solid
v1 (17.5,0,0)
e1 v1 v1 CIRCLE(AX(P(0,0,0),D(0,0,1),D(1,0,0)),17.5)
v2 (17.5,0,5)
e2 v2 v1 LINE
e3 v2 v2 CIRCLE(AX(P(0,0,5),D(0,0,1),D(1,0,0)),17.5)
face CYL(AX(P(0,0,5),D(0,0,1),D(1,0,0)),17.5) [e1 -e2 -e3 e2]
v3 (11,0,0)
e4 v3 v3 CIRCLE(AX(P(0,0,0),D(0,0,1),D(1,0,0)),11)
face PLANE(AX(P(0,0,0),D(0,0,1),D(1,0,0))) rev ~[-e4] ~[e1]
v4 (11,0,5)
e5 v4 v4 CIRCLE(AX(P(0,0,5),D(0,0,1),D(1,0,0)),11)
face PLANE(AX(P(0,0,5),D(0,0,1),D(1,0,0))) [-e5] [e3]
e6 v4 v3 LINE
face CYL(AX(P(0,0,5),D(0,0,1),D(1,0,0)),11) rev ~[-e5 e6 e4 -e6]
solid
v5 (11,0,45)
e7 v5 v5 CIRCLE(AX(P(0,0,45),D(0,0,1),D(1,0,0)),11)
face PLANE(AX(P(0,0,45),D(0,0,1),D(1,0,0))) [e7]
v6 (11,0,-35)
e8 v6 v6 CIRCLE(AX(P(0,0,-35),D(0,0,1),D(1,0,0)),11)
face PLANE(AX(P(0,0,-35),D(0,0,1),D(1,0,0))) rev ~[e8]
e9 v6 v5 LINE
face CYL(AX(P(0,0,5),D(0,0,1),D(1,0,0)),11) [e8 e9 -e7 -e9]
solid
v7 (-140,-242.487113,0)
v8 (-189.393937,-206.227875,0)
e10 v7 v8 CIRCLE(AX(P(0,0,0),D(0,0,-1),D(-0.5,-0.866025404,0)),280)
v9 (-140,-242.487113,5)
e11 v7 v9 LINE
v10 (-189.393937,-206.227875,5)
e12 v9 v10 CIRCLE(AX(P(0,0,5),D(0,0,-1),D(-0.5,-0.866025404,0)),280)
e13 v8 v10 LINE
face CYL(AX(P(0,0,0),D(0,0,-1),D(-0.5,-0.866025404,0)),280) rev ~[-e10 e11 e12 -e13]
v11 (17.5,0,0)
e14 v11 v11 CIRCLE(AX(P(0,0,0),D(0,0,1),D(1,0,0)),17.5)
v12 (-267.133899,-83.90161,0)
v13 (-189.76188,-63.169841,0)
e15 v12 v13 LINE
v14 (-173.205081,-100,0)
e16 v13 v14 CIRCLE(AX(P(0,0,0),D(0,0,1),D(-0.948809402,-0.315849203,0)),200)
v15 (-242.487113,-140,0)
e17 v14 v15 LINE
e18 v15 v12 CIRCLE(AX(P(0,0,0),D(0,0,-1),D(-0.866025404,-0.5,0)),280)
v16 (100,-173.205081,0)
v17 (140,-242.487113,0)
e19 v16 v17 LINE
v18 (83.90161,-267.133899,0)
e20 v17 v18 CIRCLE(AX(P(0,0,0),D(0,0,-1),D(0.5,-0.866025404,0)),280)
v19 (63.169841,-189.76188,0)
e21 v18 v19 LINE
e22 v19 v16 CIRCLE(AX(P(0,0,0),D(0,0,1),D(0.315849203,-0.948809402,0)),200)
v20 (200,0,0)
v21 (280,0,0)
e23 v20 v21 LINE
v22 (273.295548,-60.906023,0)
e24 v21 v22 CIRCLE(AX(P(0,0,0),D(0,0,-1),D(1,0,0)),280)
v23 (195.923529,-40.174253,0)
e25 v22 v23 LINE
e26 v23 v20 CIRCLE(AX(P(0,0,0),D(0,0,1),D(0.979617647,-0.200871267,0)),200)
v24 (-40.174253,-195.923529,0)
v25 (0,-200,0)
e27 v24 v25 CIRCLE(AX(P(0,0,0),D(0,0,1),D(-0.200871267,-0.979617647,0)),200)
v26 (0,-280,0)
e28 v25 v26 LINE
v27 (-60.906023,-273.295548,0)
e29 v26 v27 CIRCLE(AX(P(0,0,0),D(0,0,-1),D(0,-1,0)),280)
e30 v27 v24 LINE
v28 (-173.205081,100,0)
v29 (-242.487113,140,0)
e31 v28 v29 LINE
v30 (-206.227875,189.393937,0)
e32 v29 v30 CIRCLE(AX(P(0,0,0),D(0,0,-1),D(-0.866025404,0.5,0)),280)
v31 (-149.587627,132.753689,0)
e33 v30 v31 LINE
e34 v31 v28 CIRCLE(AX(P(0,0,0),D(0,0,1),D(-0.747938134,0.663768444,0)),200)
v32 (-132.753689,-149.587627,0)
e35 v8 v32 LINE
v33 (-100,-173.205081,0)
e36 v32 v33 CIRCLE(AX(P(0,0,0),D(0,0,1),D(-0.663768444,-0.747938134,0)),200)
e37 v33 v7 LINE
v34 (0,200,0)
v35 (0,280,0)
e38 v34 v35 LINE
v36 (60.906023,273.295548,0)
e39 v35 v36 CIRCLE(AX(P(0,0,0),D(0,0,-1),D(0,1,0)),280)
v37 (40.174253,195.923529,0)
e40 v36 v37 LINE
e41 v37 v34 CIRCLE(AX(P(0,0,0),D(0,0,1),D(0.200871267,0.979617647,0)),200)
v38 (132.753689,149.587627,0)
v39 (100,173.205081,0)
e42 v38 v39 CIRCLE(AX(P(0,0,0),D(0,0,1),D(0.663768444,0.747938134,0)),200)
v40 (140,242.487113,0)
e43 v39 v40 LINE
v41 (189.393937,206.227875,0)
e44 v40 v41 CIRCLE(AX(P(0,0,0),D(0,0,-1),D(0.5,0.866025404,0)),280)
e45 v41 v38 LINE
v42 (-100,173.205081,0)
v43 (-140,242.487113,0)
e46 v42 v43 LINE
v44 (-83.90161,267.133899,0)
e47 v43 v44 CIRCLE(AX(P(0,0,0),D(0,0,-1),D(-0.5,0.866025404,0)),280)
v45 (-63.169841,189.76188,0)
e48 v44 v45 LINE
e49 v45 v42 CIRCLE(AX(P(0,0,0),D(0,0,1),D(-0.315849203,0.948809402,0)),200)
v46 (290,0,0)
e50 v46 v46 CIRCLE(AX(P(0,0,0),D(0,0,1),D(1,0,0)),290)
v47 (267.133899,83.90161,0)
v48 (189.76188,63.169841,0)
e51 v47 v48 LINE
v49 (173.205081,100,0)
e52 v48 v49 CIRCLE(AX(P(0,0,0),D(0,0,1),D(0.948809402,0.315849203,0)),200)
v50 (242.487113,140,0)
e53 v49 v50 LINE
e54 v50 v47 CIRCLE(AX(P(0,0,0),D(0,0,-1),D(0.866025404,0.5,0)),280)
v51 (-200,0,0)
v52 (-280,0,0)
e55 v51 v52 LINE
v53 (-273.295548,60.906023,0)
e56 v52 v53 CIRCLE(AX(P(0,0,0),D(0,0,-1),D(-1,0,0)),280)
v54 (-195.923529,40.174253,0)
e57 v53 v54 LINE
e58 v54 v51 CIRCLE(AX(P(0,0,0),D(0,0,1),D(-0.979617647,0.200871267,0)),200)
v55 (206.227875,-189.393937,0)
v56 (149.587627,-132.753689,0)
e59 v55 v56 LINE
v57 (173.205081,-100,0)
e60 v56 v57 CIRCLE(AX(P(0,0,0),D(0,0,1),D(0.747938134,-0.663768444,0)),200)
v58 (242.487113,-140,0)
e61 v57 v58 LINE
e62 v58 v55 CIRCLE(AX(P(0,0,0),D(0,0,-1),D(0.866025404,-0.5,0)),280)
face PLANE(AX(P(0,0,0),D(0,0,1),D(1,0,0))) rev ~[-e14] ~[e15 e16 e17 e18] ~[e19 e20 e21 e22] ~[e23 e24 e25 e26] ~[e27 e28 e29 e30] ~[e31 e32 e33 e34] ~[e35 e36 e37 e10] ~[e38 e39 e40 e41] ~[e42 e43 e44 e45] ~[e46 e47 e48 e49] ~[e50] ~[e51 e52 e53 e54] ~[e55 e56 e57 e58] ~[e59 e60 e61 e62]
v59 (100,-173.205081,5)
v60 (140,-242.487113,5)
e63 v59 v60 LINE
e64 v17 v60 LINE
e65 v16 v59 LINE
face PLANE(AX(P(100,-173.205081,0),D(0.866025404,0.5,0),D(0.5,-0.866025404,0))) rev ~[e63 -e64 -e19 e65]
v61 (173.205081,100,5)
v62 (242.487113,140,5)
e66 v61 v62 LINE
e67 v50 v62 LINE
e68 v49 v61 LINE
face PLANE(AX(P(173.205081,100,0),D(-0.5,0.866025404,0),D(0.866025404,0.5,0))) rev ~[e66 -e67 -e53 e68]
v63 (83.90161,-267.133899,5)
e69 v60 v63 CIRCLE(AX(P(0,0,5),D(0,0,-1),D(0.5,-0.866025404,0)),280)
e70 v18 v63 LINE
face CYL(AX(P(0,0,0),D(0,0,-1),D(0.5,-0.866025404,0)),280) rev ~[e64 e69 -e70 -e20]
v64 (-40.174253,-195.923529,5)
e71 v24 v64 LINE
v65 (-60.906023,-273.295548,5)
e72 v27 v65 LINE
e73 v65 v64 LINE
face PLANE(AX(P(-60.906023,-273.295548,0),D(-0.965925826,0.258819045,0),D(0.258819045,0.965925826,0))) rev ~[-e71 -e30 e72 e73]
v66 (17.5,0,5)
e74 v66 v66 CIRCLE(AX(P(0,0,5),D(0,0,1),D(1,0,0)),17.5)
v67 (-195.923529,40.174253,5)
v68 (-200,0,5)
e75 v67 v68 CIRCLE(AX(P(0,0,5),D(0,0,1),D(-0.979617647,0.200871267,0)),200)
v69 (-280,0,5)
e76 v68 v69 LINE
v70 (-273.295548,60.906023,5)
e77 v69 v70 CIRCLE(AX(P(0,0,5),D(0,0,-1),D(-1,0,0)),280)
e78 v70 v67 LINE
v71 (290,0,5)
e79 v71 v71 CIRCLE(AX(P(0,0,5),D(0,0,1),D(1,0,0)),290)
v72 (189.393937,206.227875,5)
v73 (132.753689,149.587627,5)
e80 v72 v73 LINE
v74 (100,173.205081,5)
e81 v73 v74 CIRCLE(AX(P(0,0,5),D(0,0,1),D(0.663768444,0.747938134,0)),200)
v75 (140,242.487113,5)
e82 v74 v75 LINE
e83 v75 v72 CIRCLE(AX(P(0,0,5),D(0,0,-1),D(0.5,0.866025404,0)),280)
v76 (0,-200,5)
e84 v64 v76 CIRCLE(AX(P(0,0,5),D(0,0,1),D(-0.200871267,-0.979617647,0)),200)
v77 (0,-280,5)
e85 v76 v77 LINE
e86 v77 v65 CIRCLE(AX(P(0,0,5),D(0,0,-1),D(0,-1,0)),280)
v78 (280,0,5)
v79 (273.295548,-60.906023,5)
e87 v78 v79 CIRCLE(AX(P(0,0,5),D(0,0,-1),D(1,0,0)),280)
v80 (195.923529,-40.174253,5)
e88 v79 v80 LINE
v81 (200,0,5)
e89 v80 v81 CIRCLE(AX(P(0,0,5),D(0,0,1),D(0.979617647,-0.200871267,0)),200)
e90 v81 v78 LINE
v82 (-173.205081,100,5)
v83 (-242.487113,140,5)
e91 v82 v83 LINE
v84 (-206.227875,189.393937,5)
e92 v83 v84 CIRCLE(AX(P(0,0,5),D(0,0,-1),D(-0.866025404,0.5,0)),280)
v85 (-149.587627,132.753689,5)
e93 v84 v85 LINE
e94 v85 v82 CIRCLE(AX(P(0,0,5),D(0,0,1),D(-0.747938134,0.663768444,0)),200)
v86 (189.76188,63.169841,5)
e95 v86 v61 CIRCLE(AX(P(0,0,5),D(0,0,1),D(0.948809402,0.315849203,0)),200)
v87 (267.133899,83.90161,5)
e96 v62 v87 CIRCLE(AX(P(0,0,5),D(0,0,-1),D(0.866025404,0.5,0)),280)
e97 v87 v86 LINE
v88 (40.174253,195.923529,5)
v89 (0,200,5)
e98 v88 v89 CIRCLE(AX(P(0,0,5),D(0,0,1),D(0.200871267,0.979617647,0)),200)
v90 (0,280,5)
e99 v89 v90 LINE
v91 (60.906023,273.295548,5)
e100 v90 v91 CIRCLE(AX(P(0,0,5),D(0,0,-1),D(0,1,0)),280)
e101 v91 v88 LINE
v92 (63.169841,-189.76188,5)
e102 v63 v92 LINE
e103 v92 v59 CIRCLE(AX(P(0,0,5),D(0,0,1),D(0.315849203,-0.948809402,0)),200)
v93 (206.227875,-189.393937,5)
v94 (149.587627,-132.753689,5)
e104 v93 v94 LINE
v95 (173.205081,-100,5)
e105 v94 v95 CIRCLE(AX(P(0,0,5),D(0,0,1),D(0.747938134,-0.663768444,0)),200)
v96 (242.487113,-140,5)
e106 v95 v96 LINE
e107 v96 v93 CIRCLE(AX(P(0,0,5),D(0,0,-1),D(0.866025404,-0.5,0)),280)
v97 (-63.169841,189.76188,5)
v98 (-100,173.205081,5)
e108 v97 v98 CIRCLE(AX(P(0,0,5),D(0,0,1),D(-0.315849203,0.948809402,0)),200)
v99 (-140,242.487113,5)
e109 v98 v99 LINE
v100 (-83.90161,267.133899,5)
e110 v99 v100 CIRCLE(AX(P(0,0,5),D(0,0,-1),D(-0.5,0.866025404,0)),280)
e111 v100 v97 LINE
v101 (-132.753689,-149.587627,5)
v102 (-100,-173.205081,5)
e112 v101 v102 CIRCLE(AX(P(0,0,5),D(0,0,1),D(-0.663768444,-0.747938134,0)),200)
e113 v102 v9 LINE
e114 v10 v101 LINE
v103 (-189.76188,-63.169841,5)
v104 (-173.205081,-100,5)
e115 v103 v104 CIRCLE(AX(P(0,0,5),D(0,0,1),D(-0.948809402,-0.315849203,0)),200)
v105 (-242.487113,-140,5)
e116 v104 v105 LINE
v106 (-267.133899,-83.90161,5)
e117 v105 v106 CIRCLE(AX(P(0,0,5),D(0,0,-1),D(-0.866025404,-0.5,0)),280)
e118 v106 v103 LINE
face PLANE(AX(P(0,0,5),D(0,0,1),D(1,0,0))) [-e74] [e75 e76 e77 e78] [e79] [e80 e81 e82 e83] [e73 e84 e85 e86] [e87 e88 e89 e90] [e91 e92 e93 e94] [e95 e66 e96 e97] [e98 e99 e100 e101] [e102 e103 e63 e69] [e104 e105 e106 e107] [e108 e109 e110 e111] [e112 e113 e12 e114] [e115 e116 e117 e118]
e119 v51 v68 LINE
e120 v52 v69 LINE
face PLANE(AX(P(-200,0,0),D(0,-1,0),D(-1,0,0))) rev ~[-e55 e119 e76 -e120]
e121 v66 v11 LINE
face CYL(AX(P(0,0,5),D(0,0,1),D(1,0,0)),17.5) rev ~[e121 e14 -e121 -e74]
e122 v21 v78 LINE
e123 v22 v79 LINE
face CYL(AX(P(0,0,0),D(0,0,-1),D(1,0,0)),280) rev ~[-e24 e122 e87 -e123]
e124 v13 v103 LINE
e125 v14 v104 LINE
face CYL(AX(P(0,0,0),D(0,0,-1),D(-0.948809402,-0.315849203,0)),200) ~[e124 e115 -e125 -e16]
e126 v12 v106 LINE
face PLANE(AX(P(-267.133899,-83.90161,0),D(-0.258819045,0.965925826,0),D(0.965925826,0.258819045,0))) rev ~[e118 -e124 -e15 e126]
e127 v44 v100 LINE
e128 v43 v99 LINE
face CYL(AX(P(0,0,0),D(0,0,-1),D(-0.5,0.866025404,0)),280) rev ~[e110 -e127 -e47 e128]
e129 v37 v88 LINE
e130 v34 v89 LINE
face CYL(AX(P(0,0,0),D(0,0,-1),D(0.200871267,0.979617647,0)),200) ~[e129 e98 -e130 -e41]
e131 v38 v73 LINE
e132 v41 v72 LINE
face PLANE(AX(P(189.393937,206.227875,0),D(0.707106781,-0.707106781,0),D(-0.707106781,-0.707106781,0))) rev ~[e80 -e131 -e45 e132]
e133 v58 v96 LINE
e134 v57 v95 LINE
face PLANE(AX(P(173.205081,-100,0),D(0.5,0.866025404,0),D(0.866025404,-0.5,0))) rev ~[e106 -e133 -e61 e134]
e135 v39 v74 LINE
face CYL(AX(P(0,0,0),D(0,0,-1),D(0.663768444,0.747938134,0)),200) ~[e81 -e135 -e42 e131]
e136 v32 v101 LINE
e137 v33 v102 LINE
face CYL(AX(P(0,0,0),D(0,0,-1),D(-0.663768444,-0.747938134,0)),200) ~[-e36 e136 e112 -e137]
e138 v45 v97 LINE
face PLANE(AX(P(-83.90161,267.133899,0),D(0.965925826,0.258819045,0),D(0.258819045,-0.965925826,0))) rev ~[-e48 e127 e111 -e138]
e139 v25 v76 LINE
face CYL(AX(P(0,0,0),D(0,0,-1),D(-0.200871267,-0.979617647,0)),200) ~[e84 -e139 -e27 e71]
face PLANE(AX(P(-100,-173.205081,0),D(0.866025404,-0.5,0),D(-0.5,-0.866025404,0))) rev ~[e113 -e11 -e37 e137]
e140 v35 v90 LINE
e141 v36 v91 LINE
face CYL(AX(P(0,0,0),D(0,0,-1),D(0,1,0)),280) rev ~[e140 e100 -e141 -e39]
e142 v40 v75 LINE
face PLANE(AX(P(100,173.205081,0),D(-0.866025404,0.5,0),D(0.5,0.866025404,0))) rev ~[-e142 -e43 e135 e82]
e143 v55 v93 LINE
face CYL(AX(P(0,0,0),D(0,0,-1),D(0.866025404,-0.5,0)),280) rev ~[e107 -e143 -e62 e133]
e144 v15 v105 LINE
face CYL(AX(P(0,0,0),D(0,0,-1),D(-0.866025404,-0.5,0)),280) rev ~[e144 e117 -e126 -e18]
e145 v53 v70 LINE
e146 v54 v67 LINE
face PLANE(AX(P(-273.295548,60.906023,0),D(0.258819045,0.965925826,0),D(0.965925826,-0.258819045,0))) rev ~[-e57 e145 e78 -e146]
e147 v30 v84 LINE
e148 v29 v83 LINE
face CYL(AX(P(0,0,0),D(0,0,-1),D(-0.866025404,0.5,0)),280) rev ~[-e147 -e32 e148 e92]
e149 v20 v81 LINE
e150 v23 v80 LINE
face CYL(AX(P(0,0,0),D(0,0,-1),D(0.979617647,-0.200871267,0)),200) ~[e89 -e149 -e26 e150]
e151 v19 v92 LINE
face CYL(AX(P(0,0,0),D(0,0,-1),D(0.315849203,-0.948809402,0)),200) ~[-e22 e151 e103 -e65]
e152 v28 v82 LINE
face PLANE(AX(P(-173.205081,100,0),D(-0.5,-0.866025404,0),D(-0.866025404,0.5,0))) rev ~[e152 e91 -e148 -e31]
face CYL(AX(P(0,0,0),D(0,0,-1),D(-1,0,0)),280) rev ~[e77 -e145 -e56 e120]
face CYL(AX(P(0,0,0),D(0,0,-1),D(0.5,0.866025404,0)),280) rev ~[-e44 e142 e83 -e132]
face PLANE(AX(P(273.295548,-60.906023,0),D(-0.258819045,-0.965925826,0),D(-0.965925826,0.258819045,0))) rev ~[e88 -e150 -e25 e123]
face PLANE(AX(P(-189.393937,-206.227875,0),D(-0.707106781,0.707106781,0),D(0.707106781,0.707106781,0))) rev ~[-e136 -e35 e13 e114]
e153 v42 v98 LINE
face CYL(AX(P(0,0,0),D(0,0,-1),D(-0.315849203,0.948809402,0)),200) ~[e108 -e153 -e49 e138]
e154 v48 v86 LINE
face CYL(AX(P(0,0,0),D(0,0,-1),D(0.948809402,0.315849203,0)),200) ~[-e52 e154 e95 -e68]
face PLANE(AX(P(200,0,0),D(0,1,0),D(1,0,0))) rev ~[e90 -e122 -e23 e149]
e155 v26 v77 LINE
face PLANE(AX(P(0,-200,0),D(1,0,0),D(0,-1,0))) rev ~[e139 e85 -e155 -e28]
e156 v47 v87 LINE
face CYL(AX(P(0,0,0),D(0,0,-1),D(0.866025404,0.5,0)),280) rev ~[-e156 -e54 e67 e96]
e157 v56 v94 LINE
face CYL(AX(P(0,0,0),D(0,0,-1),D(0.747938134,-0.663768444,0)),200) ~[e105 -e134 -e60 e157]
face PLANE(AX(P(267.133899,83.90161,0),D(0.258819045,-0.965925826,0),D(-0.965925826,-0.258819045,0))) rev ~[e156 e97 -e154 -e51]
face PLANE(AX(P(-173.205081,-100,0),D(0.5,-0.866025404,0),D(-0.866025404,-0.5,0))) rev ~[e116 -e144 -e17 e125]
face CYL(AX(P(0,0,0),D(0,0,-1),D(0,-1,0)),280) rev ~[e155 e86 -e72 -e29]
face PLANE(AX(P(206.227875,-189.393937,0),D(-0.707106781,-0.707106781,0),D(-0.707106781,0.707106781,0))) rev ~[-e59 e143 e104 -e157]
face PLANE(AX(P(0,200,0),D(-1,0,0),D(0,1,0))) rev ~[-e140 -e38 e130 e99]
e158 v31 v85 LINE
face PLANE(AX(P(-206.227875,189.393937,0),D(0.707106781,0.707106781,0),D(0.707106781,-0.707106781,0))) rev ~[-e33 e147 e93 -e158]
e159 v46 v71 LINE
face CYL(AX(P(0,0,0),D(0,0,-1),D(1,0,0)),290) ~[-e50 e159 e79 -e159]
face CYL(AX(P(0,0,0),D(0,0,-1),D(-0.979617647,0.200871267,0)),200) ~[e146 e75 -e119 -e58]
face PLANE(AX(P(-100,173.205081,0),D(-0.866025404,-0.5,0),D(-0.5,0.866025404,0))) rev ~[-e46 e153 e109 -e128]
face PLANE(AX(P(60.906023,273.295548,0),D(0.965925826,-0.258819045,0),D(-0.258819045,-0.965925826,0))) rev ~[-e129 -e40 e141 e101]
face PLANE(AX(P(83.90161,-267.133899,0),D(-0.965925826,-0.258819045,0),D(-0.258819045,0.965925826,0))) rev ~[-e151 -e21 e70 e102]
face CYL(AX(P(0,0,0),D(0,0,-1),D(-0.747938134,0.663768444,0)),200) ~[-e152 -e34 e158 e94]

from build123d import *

# Parameters (mm, degrees)
F0_R      = 290
F1_DEPTH  = 5
F2_R      = 11
F3_DEPTH  = 25
F4_DEPTH  = 40
F5_R      = 143.6188138999
F5_R_2    = 11
F6_DEPTH  = 5
F7_R      = 17.5
F7_R_2    = 11
F8_DEPTH  = 25
F9_R      = 17.5
F9_R_2    = 11
F10_DEPTH = 5


with BuildPart() as f1:
    # F0 (on Top) → F1 (new body)
    with BuildSketch(Plane.XY):
        Circle(F0_R)
        with BuildLine():
            Line((-60.9060232783, -273.2955475825), (-40.1742534792, -195.9235293613))
            ThreePointArc((-40.1742534792, -195.9235293613), (-20.1902715155, -198.9782725227), (0, -200))
            Line((0, -200), (0, -280))
            ThreePointArc((0, -280), (-30.6369603331, -278.3188399328), (-60.9060232783, -273.2955475825))
        make_face(mode=Mode.SUBTRACT)
        with BuildLine():
            Line((-189.3939371938, -206.2278753084), (-132.7536887717, -149.5876268864))
            ThreePointArc((-132.7536887717, -149.5876268864), (-116.9744243031, -162.2251030481), (-100, -173.2050807569))
            Line((-100, -173.2050807569), (-140, -242.4871130596))
            ThreePointArc((-140, -242.4871130596), (-165.6918059096, -225.7127055671), (-189.3939371938, -206.2278753084))
        make_face(mode=Mode.SUBTRACT)
        with BuildLine():
            Line((-267.1338985868, -83.9016103887), (-189.7618803656, -63.1698405896))
            ThreePointArc((-189.7618803656, -63.1698405896), (-182.4153745636, -82.0038482196), (-173.2050807569, -100))
            Line((-173.2050807569, -100), (-242.4871130596, -140))
            ThreePointArc((-242.4871130596, -140), (-256.3496659002, -112.6270340232), (-267.1338985868, -83.9016103887))
        make_face(mode=Mode.SUBTRACT)
        with BuildLine():
            Line((-87.8987052892, -104.7543223331), (-73.813275879, -87.9678451288))
            ThreePointArc((-73.813275879, -87.9678451288), (-70.6984313943, -90.4901832852), (-67.4974601638, -92.9022838472))
            Line((-67.4974601638, -92.9022838472), (-80.3776730954, -110.6303760581))
            ThreePointArc((-80.3776730954, -110.6303760581), (-84.1894701397, -107.7579860455), (-87.8987052892, -104.7543223331))
        make_face(mode=Mode.SUBTRACT)
        with BuildLine():
            Line((-103.2037127424, -89.7142358557), (-86.6657147603, -75.337874656))
            ThreePointArc((-86.6657147603, -75.337874656), (-83.9837998001, -78.3164276747), (-81.1995734982, -81.1995734982))
            Line((-81.1995734982, -81.1995734982), (-96.6944942564, -96.6944942564))
            ThreePointArc((-96.6944942564, -96.6944942564), (-100.0100209587, -93.2611716998), (-103.2037127424, -89.7142358557))
        make_face(mode=Mode.SUBTRACT)
        with BuildLine():
            Line((-70.4293399927, -117.215009735), (-59.1433091734, -98.431755306))
            ThreePointArc((-59.1433091734, -98.431755306), (-55.6722329729, -100.4357702634), (-52.1333353489, -102.3174316429))
            Line((-52.1333353489, -102.3174316429), (-62.0816868647, -121.8421708401))
            ThreePointArc((-62.0816868647, -121.8421708401), (-66.295895157, -119.6014411465), (-70.4293399927, -117.215009735))
        make_face(mode=Mode.SUBTRACT)
        with BuildLine():
            Line((-51.225770604, -126.7894745829), (-43.0170379105, -106.4719489913))
            ThreePointArc((-43.0170379105, -106.4719489913), (-39.2751994101, -107.9082952506), (-35.4855147971, -109.2131846994))
            Line((-35.4855147971, -109.2131846994), (-42.257043466, -130.053807005))
            ThreePointArc((-42.257043466, -130.053807005), (-46.7698952121, -128.499911832), (-51.225770604, -126.7894745829))
        make_face(mode=Mode.SUBTRACT)
        with BuildLine():
            Line((-30.7608527345, -133.2419617765), (-25.8315444089, -111.8904499323))
            ThreePointArc((-25.8315444089, -111.8904499323), (-21.911080091, -112.7237598816), (-17.9639231014, -113.4197466908))
            Line((-17.9639231014, -113.4197466908), (-21.3918914141, -135.0630868177))
            ThreePointArc((-21.3918914141, -135.0630868177), (-26.0922652267, -134.2342882215), (-30.7608527345, -133.2419617765))
        make_face(mode=Mode.SUBTRACT)
        with BuildLine():
            Line((-9.5385005812, -136.4135896663), (-8.009992554, -114.5538366528))
            ThreePointArc((-8.009992554, -114.5538366528), (-4.0074372614, -114.7635914356), (0, -114.8335381001))
            Line((0, -114.8335381001), (0, -136.7466651842))
            ThreePointArc((0, -136.7466651842), (-4.7721570762, -136.6633709369), (-9.5385005812, -136.4135896663))
        make_face(mode=Mode.SUBTRACT)
        with BuildLine():
            Line((-125.8757870263, -53.4316074951), (-105.704676351, -44.8693979248))
            ThreePointArc((-105.704676351, -44.8693979248), (-104.0744471533, -48.5309274826), (-102.3174316429, -52.1333353489))
            Line((-102.3174316429, -52.1333353489), (-121.8421708401, -62.0816868647))
            ThreePointArc((-121.8421708401, -62.0816868647), (-123.9344690982, -57.7918489784), (-125.8757870263, -53.4316074951))
        make_face(mode=Mode.SUBTRACT)
        with BuildLine():
            Line((-115.9675022744, -72.4650871471), (-97.3841561172, -60.852835677))
            ThreePointArc((-97.3841561172, -60.852835677), (-95.2012083286, -64.2142616976), (-92.9022838472, -67.4974601638))
            Line((-92.9022838472, -67.4974601638), (-110.6303760581, -80.3776730954))
            ThreePointArc((-110.6303760581, -80.3776730954), (-113.3679931475, -76.4679577908), (-115.9675022744, -72.4650871471))
        make_face(mode=Mode.SUBTRACT)
        with BuildLine():
            Line((-132.6845921438, -33.0824643372), (-111.4223966393, -27.7811266826))
            ThreePointArc((-111.4223966393, -27.7811266826), (-110.3850276859, -31.652600768), (-109.2131846994, -35.4855147971))
            Line((-109.2131846994, -35.4855147971), (-130.053807005, -42.257043466))
            ThreePointArc((-130.053807005, -42.257043466), (-131.4492671047, -37.692713044), (-132.6845921438, -33.0824643372))
        make_face(mode=Mode.SUBTRACT)
        with BuildLine():
            Line((-136.2262622479, -11.9187211129), (-114.3965277326, -10.0087919012))
            ThreePointArc((-114.3965277326, -10.0087919012), (-113.9775624899, -13.9948819736), (-113.4197466908, -17.9639231014))
            Line((-113.4197466908, -17.9639231014), (-135.0630868177, -21.3918914141))
            ThreePointArc((-135.0630868177, -21.3918914141), (-135.7273479001, -16.6654574195), (-136.2262622479, -11.9187211129))
        make_face(mode=Mode.SUBTRACT)
        with BuildLine():
            Line((83.9016103887, -267.1338985868), (63.1698405896, -189.7618803656))
            ThreePointArc((63.1698405896, -189.7618803656), (82.0038482196, -182.4153745636), (100, -173.2050807569))
            Line((100, -173.2050807569), (140, -242.4871130596))
            ThreePointArc((140, -242.4871130596), (112.6270340232, -256.3496659002), (83.9016103887, -267.1338985868))
        make_face(mode=Mode.SUBTRACT)
        with BuildLine():
            Line((11.9187211129, -136.2262622479), (10.0087919012, -114.3965277326))
            ThreePointArc((10.0087919012, -114.3965277326), (13.9948819736, -113.9775624899), (17.9639231014, -113.4197466908))
            Line((17.9639231014, -113.4197466908), (21.3918914141, -135.0630868177))
            ThreePointArc((21.3918914141, -135.0630868177), (16.6654574195, -135.7273479001), (11.9187211129, -136.2262622479))
        make_face(mode=Mode.SUBTRACT)
        with BuildLine():
            Line((33.0824643372, -132.6845921438), (27.7811266826, -111.4223966393))
            ThreePointArc((27.7811266826, -111.4223966393), (31.652600768, -110.3850276859), (35.4855147971, -109.2131846994))
            Line((35.4855147971, -109.2131846994), (42.257043466, -130.053807005))
            ThreePointArc((42.257043466, -130.053807005), (37.692713044, -131.4492671047), (33.0824643372, -132.6845921438))
        make_face(mode=Mode.SUBTRACT)
        with BuildLine():
            Line((53.4316074951, -125.8757870263), (44.8693979248, -105.704676351))
            ThreePointArc((44.8693979248, -105.704676351), (48.5309274826, -104.0744471533), (52.1333353489, -102.3174316429))
            Line((52.1333353489, -102.3174316429), (62.0816868647, -121.8421708401))
            ThreePointArc((62.0816868647, -121.8421708401), (57.7918489784, -123.9344690982), (53.4316074951, -125.8757870263))
        make_face(mode=Mode.SUBTRACT)
        with BuildLine():
            Line((72.4650871471, -115.9675022744), (60.852835677, -97.3841561172))
            ThreePointArc((60.852835677, -97.3841561172), (64.2142616976, -95.2012083286), (67.4974601638, -92.9022838472))
            Line((67.4974601638, -92.9022838472), (80.3776730954, -110.6303760581))
            ThreePointArc((80.3776730954, -110.6303760581), (76.4679577908, -113.3679931475), (72.4650871471, -115.9675022744))
        make_face(mode=Mode.SUBTRACT)
        with BuildLine():
            Line((89.7142358557, -103.2037127424), (75.337874656, -86.6657147603))
            ThreePointArc((75.337874656, -86.6657147603), (78.3164276747, -83.9837998001), (81.1995734982, -81.1995734982))
            Line((81.1995734982, -81.1995734982), (96.6944942564, -96.6944942564))
            ThreePointArc((96.6944942564, -96.6944942564), (93.2611716998, -100.0100209587), (89.7142358557, -103.2037127424))
        make_face(mode=Mode.SUBTRACT)
        with BuildLine():
            Line((104.7543223331, -87.8987052892), (87.9678451288, -73.813275879))
            ThreePointArc((87.9678451288, -73.813275879), (90.4901832852, -70.6984313943), (92.9022838472, -67.4974601638))
            Line((92.9022838472, -67.4974601638), (110.6303760581, -80.3776730954))
            ThreePointArc((110.6303760581, -80.3776730954), (107.7579860455, -84.1894701397), (104.7543223331, -87.8987052892))
        make_face(mode=Mode.SUBTRACT)
        with BuildLine():
            Line((117.215009735, -70.4293399927), (98.431755306, -59.1433091734))
            ThreePointArc((98.431755306, -59.1433091734), (100.4357702634, -55.6722329729), (102.3174316429, -52.1333353489))
            Line((102.3174316429, -52.1333353489), (121.8421708401, -62.0816868647))
            ThreePointArc((121.8421708401, -62.0816868647), (119.6014411465, -66.295895157), (117.215009735, -70.4293399927))
        make_face(mode=Mode.SUBTRACT)
        with BuildLine():
            Line((126.7894745829, -51.225770604), (106.4719489913, -43.0170379105))
            ThreePointArc((106.4719489913, -43.0170379105), (107.9082952506, -39.2751994101), (109.2131846994, -35.4855147971))
            Line((109.2131846994, -35.4855147971), (130.053807005, -42.257043466))
            ThreePointArc((130.053807005, -42.257043466), (128.499911832, -46.7698952121), (126.7894745829, -51.225770604))
        make_face(mode=Mode.SUBTRACT)
        with BuildLine():
            Line((133.2419617765, -30.7608527345), (111.8904499323, -25.8315444089))
            ThreePointArc((111.8904499323, -25.8315444089), (112.7237598816, -21.911080091), (113.4197466908, -17.9639231014))
            Line((113.4197466908, -17.9639231014), (135.0630868177, -21.3918914141))
            ThreePointArc((135.0630868177, -21.3918914141), (134.2342882215, -26.0922652267), (133.2419617765, -30.7608527345))
        make_face(mode=Mode.SUBTRACT)
        with BuildLine():
            Line((136.4135896663, -9.5385005812), (114.5538366528, -8.009992554))
            ThreePointArc((114.5538366528, -8.009992554), (114.7635914356, -4.0074372614), (114.8335381001, 0))
            Line((114.8335381001, 0), (136.7466651842, 0))
            ThreePointArc((136.7466651842, 0), (136.6633709369, -4.7721570762), (136.4135896663, -9.5385005812))
        make_face(mode=Mode.SUBTRACT)
        with BuildLine():
            Line((206.2278753084, -189.3939371938), (149.5876268864, -132.7536887717))
            ThreePointArc((149.5876268864, -132.7536887717), (162.2251030481, -116.9744243031), (173.2050807569, -100))
            Line((173.2050807569, -100), (242.4871130596, -140))
            ThreePointArc((242.4871130596, -140), (225.7127055671, -165.6918059096), (206.2278753084, -189.3939371938))
        make_face(mode=Mode.SUBTRACT)
        with BuildLine():
            Line((273.2955475825, -60.9060232783), (195.9235293613, -40.1742534792))
            ThreePointArc((195.9235293613, -40.1742534792), (198.9782725227, -20.1902715155), (200, 0))
            Line((200, 0), (280, 0))
            ThreePointArc((280, 0), (278.3188399328, -30.6369603331), (273.2955475825, -60.9060232783))
        make_face(mode=Mode.SUBTRACT)
        with BuildLine():
            Line((-273.2955475825, 60.9060232783), (-195.9235293613, 40.1742534792))
            ThreePointArc((-195.9235293613, 40.1742534792), (-198.9782725227, 20.1902715155), (-200, 0))
            Line((-200, 0), (-280, 0))
            ThreePointArc((-280, 0), (-278.3188399328, 30.6369603331), (-273.2955475825, 60.9060232783))
        make_face(mode=Mode.SUBTRACT)
        with BuildLine():
            Line((-206.2278753084, 189.3939371938), (-149.5876268864, 132.7536887717))
            ThreePointArc((-149.5876268864, 132.7536887717), (-162.2251030481, 116.9744243031), (-173.2050807569, 100))
            Line((-173.2050807569, 100), (-242.4871130596, 140))
            ThreePointArc((-242.4871130596, 140), (-225.7127055671, 165.6918059096), (-206.2278753084, 189.3939371938))
        make_face(mode=Mode.SUBTRACT)
        with BuildLine():
            Line((-136.4135896663, 9.5385005812), (-114.5538366528, 8.009992554))
            ThreePointArc((-114.5538366528, 8.009992554), (-114.7635914356, 4.0074372614), (-114.8335381001, 0))
            Line((-114.8335381001, 0), (-136.7466651842, 0))
            ThreePointArc((-136.7466651842, 0), (-136.6633709369, 4.7721570762), (-136.4135896663, 9.5385005812))
        make_face(mode=Mode.SUBTRACT)
        with BuildLine():
            Line((-133.2419617765, 30.7608527345), (-111.8904499323, 25.8315444089))
            ThreePointArc((-111.8904499323, 25.8315444089), (-112.7237598816, 21.911080091), (-113.4197466908, 17.9639231014))
            Line((-113.4197466908, 17.9639231014), (-135.0630868177, 21.3918914141))
            ThreePointArc((-135.0630868177, 21.3918914141), (-134.2342882215, 26.0922652267), (-133.2419617765, 30.7608527345))
        make_face(mode=Mode.SUBTRACT)
        with BuildLine():
            Line((-126.7894745829, 51.225770604), (-106.4719489913, 43.0170379105))
            ThreePointArc((-106.4719489913, 43.0170379105), (-107.9082952506, 39.2751994101), (-109.2131846994, 35.4855147971))
            Line((-109.2131846994, 35.4855147971), (-130.053807005, 42.257043466))
            ThreePointArc((-130.053807005, 42.257043466), (-128.499911832, 46.7698952121), (-126.7894745829, 51.225770604))
        make_face(mode=Mode.SUBTRACT)
        with BuildLine():
            Line((-117.215009735, 70.4293399927), (-98.431755306, 59.1433091734))
            ThreePointArc((-98.431755306, 59.1433091734), (-100.4357702634, 55.6722329729), (-102.3174316429, 52.1333353489))
            Line((-102.3174316429, 52.1333353489), (-121.8421708401, 62.0816868647))
            ThreePointArc((-121.8421708401, 62.0816868647), (-119.6014411465, 66.295895157), (-117.215009735, 70.4293399927))
        make_face(mode=Mode.SUBTRACT)
        with BuildLine():
            Line((-104.7543223331, 87.8987052892), (-87.9678451288, 73.813275879))
            ThreePointArc((-87.9678451288, 73.813275879), (-90.4901832852, 70.6984313943), (-92.9022838472, 67.4974601638))
            Line((-92.9022838472, 67.4974601638), (-110.6303760581, 80.3776730954))
            ThreePointArc((-110.6303760581, 80.3776730954), (-107.7579860455, 84.1894701397), (-104.7543223331, 87.8987052892))
        make_face(mode=Mode.SUBTRACT)
        with BuildLine():
            Line((-89.7142358557, 103.2037127424), (-75.337874656, 86.6657147603))
            ThreePointArc((-75.337874656, 86.6657147603), (-78.3164276747, 83.9837998001), (-81.1995734982, 81.1995734982))
            Line((-81.1995734982, 81.1995734982), (-96.6944942564, 96.6944942564))
            ThreePointArc((-96.6944942564, 96.6944942564), (-93.2611716998, 100.0100209587), (-89.7142358557, 103.2037127424))
        make_face(mode=Mode.SUBTRACT)
        with BuildLine():
            Line((-72.4650871471, 115.9675022744), (-60.852835677, 97.3841561172))
            ThreePointArc((-60.852835677, 97.3841561172), (-64.2142616976, 95.2012083286), (-67.4974601638, 92.9022838472))
            Line((-67.4974601638, 92.9022838472), (-80.3776730954, 110.6303760581))
            ThreePointArc((-80.3776730954, 110.6303760581), (-76.4679577908, 113.3679931475), (-72.4650871471, 115.9675022744))
        make_face(mode=Mode.SUBTRACT)
        with BuildLine():
            Line((-53.4316074951, 125.8757870263), (-44.8693979248, 105.704676351))
            ThreePointArc((-44.8693979248, 105.704676351), (-48.5309274826, 104.0744471533), (-52.1333353489, 102.3174316429))
            Line((-52.1333353489, 102.3174316429), (-62.0816868647, 121.8421708401))
            ThreePointArc((-62.0816868647, 121.8421708401), (-57.7918489784, 123.9344690982), (-53.4316074951, 125.8757870263))
        make_face(mode=Mode.SUBTRACT)
        with BuildLine():
            Line((-33.0824643372, 132.6845921438), (-27.7811266826, 111.4223966393))
            ThreePointArc((-27.7811266826, 111.4223966393), (-31.652600768, 110.3850276859), (-35.4855147971, 109.2131846994))
            Line((-35.4855147971, 109.2131846994), (-42.257043466, 130.053807005))
            ThreePointArc((-42.257043466, 130.053807005), (-37.692713044, 131.4492671047), (-33.0824643372, 132.6845921438))
        make_face(mode=Mode.SUBTRACT)
        with BuildLine():
            Line((-11.9187211129, 136.2262622479), (-10.0087919012, 114.3965277326))
            ThreePointArc((-10.0087919012, 114.3965277326), (-13.9948819736, 113.9775624899), (-17.9639231014, 113.4197466908))
            Line((-17.9639231014, 113.4197466908), (-21.3918914141, 135.0630868177))
            ThreePointArc((-21.3918914141, 135.0630868177), (-16.6654574195, 135.7273479001), (-11.9187211129, 136.2262622479))
        make_face(mode=Mode.SUBTRACT)
        with BuildLine():
            Line((-83.9016103887, 267.1338985868), (-63.1698405896, 189.7618803656))
            ThreePointArc((-63.1698405896, 189.7618803656), (-82.0038482196, 182.4153745636), (-100, 173.2050807569))
            Line((-100, 173.2050807569), (-140, 242.4871130596))
            ThreePointArc((-140, 242.4871130596), (-112.6270340232, 256.3496659002), (-83.9016103887, 267.1338985868))
        make_face(mode=Mode.SUBTRACT)
        Polygon((5, 5), (5, -5), (-5, -5), (-5, 5), (0, 5), align=None, mode=Mode.SUBTRACT)
        with BuildLine():
            Line((136.2262622479, 11.9187211129), (114.3965277326, 10.0087919012))
            ThreePointArc((114.3965277326, 10.0087919012), (113.9775624899, 13.9948819736), (113.4197466908, 17.9639231014))
            Line((113.4197466908, 17.9639231014), (135.0630868177, 21.3918914141))
            ThreePointArc((135.0630868177, 21.3918914141), (135.7273479001, 16.6654574195), (136.2262622479, 11.9187211129))
        make_face(mode=Mode.SUBTRACT)
        with BuildLine():
            Line((132.6845921438, 33.0824643372), (111.4223966393, 27.7811266826))
            ThreePointArc((111.4223966393, 27.7811266826), (110.3850276859, 31.652600768), (109.2131846994, 35.4855147971))
            Line((109.2131846994, 35.4855147971), (130.053807005, 42.257043466))
            ThreePointArc((130.053807005, 42.257043466), (131.4492671047, 37.692713044), (132.6845921438, 33.0824643372))
        make_face(mode=Mode.SUBTRACT)
        with BuildLine():
            Line((115.9675022744, 72.4650871471), (97.3841561172, 60.852835677))
            ThreePointArc((97.3841561172, 60.852835677), (95.2012083286, 64.2142616976), (92.9022838472, 67.4974601638))
            Line((92.9022838472, 67.4974601638), (110.6303760581, 80.3776730954))
            ThreePointArc((110.6303760581, 80.3776730954), (113.3679931475, 76.4679577908), (115.9675022744, 72.4650871471))
        make_face(mode=Mode.SUBTRACT)
        with BuildLine():
            Line((125.8757870263, 53.4316074951), (105.704676351, 44.8693979248))
            ThreePointArc((105.704676351, 44.8693979248), (104.0744471533, 48.5309274826), (102.3174316429, 52.1333353489))
            Line((102.3174316429, 52.1333353489), (121.8421708401, 62.0816868647))
            ThreePointArc((121.8421708401, 62.0816868647), (123.9344690982, 57.7918489784), (125.8757870263, 53.4316074951))
        make_face(mode=Mode.SUBTRACT)
        with BuildLine():
            ThreePointArc((0, 136.7466651842), (4.7721570762, 136.6633709369), (9.5385005812, 136.4135896663))
            Line((9.5385005812, 136.4135896663), (8.009992554, 114.5538366528))
            ThreePointArc((8.009992554, 114.5538366528), (4.0074372614, 114.7635914356), (0, 114.8335381001))
            Line((0, 114.8335381001), (0, 136.7466651842))
        make_face(mode=Mode.SUBTRACT)
        with BuildLine():
            Line((30.7608527345, 133.2419617765), (25.8315444089, 111.8904499323))
            ThreePointArc((25.8315444089, 111.8904499323), (21.911080091, 112.7237598816), (17.9639231014, 113.4197466908))
            Line((17.9639231014, 113.4197466908), (21.3918914141, 135.0630868177))
            ThreePointArc((21.3918914141, 135.0630868177), (26.0922652267, 134.2342882215), (30.7608527345, 133.2419617765))
        make_face(mode=Mode.SUBTRACT)
        with BuildLine():
            Line((51.225770604, 126.7894745829), (43.0170379105, 106.4719489913))
            ThreePointArc((43.0170379105, 106.4719489913), (39.2751994101, 107.9082952506), (35.4855147971, 109.2131846994))
            Line((35.4855147971, 109.2131846994), (42.257043466, 130.053807005))
            ThreePointArc((42.257043466, 130.053807005), (46.7698952121, 128.499911832), (51.225770604, 126.7894745829))
        make_face(mode=Mode.SUBTRACT)
        with BuildLine():
            Line((70.4293399927, 117.215009735), (59.1433091734, 98.431755306))
            ThreePointArc((59.1433091734, 98.431755306), (55.6722329729, 100.4357702634), (52.1333353489, 102.3174316429))
            Line((52.1333353489, 102.3174316429), (62.0816868647, 121.8421708401))
            ThreePointArc((62.0816868647, 121.8421708401), (66.295895157, 119.6014411465), (70.4293399927, 117.215009735))
        make_face(mode=Mode.SUBTRACT)
        with BuildLine():
            Line((103.2037127424, 89.7142358557), (86.6657147603, 75.337874656))
            ThreePointArc((86.6657147603, 75.337874656), (83.9837998001, 78.3164276747), (81.1995734982, 81.1995734982))
            Line((81.1995734982, 81.1995734982), (96.6944942564, 96.6944942564))
            ThreePointArc((96.6944942564, 96.6944942564), (100.0100209587, 93.2611716998), (103.2037127424, 89.7142358557))
        make_face(mode=Mode.SUBTRACT)
        with BuildLine():
            Line((87.8987052892, 104.7543223331), (73.813275879, 87.9678451288))
            ThreePointArc((73.813275879, 87.9678451288), (70.6984313943, 90.4901832852), (67.4974601638, 92.9022838472))
            Line((67.4974601638, 92.9022838472), (80.3776730954, 110.6303760581))
            ThreePointArc((80.3776730954, 110.6303760581), (84.1894701397, 107.7579860455), (87.8987052892, 104.7543223331))
        make_face(mode=Mode.SUBTRACT)
        with BuildLine():
            Line((267.1338985868, 83.9016103887), (189.7618803656, 63.1698405896))
            ThreePointArc((189.7618803656, 63.1698405896), (182.4153745636, 82.0038482196), (173.2050807569, 100))
            Line((173.2050807569, 100), (242.4871130596, 140))
            ThreePointArc((242.4871130596, 140), (256.3496659002, 112.6270340232), (267.1338985868, 83.9016103887))
        make_face(mode=Mode.SUBTRACT)
        with BuildLine():
            Line((189.3939371938, 206.2278753084), (132.7536887717, 149.5876268864))
            ThreePointArc((132.7536887717, 149.5876268864), (116.9744243031, 162.2251030481), (100, 173.2050807569))
            Line((100, 173.2050807569), (140, 242.4871130596))
            ThreePointArc((140, 242.4871130596), (165.6918059096, 225.7127055671), (189.3939371938, 206.2278753084))
        make_face(mode=Mode.SUBTRACT)
        with BuildLine():
            Line((60.9060232783, 273.2955475825), (40.1742534792, 195.9235293613))
            ThreePointArc((40.1742534792, 195.9235293613), (20.1902715155, 198.9782725227), (0, 200))
            Line((0, 200), (0, 280))
            ThreePointArc((0, 280), (30.6369603331, 278.3188399328), (60.9060232783, 273.2955475825))
        make_face(mode=Mode.SUBTRACT)
    extrude(amount=F1_DEPTH)

    # F2 (on face) → F3 (cut)
    with BuildSketch(Plane.XY.offset(5)):
        Circle(F2_R)
    extrude(amount=-F3_DEPTH, mode=Mode.SUBTRACT)



with BuildPart() as f4:
    # F2 (on face) → F4 (new body, symmetric)
    with BuildSketch(Plane.XY.offset(5)):
        Circle(F2_R)
    extrude(amount=F4_DEPTH, both=True)


with BuildPart() as f1_1:
    add(f1.part)

    add(f4.part)  # F6 merges F4
    # F5 (on face) → F6 (join)
    with BuildSketch(Plane.XY.offset(5)):
        Circle(F5_R)
        Circle(F5_R_2, mode=Mode.SUBTRACT)
    extrude(amount=-F6_DEPTH)

    # F7 (on face) → F8 (cut)
    with BuildSketch(Plane.XY.offset(5)):
        Circle(F7_R)
        Circle(F7_R_2, mode=Mode.SUBTRACT)
    extrude(amount=-F8_DEPTH, mode=Mode.SUBTRACT)


with BuildPart() as f10:
    # F9 (on face) → F10 (new body)
    with BuildSketch(Plane.XY.offset(5)):
        Circle(F9_R)
        Circle(F9_R_2, mode=Mode.SUBTRACT)
    extrude(amount=-F10_DEPTH)


solid = Compound([f1_1.part, f10.part])
